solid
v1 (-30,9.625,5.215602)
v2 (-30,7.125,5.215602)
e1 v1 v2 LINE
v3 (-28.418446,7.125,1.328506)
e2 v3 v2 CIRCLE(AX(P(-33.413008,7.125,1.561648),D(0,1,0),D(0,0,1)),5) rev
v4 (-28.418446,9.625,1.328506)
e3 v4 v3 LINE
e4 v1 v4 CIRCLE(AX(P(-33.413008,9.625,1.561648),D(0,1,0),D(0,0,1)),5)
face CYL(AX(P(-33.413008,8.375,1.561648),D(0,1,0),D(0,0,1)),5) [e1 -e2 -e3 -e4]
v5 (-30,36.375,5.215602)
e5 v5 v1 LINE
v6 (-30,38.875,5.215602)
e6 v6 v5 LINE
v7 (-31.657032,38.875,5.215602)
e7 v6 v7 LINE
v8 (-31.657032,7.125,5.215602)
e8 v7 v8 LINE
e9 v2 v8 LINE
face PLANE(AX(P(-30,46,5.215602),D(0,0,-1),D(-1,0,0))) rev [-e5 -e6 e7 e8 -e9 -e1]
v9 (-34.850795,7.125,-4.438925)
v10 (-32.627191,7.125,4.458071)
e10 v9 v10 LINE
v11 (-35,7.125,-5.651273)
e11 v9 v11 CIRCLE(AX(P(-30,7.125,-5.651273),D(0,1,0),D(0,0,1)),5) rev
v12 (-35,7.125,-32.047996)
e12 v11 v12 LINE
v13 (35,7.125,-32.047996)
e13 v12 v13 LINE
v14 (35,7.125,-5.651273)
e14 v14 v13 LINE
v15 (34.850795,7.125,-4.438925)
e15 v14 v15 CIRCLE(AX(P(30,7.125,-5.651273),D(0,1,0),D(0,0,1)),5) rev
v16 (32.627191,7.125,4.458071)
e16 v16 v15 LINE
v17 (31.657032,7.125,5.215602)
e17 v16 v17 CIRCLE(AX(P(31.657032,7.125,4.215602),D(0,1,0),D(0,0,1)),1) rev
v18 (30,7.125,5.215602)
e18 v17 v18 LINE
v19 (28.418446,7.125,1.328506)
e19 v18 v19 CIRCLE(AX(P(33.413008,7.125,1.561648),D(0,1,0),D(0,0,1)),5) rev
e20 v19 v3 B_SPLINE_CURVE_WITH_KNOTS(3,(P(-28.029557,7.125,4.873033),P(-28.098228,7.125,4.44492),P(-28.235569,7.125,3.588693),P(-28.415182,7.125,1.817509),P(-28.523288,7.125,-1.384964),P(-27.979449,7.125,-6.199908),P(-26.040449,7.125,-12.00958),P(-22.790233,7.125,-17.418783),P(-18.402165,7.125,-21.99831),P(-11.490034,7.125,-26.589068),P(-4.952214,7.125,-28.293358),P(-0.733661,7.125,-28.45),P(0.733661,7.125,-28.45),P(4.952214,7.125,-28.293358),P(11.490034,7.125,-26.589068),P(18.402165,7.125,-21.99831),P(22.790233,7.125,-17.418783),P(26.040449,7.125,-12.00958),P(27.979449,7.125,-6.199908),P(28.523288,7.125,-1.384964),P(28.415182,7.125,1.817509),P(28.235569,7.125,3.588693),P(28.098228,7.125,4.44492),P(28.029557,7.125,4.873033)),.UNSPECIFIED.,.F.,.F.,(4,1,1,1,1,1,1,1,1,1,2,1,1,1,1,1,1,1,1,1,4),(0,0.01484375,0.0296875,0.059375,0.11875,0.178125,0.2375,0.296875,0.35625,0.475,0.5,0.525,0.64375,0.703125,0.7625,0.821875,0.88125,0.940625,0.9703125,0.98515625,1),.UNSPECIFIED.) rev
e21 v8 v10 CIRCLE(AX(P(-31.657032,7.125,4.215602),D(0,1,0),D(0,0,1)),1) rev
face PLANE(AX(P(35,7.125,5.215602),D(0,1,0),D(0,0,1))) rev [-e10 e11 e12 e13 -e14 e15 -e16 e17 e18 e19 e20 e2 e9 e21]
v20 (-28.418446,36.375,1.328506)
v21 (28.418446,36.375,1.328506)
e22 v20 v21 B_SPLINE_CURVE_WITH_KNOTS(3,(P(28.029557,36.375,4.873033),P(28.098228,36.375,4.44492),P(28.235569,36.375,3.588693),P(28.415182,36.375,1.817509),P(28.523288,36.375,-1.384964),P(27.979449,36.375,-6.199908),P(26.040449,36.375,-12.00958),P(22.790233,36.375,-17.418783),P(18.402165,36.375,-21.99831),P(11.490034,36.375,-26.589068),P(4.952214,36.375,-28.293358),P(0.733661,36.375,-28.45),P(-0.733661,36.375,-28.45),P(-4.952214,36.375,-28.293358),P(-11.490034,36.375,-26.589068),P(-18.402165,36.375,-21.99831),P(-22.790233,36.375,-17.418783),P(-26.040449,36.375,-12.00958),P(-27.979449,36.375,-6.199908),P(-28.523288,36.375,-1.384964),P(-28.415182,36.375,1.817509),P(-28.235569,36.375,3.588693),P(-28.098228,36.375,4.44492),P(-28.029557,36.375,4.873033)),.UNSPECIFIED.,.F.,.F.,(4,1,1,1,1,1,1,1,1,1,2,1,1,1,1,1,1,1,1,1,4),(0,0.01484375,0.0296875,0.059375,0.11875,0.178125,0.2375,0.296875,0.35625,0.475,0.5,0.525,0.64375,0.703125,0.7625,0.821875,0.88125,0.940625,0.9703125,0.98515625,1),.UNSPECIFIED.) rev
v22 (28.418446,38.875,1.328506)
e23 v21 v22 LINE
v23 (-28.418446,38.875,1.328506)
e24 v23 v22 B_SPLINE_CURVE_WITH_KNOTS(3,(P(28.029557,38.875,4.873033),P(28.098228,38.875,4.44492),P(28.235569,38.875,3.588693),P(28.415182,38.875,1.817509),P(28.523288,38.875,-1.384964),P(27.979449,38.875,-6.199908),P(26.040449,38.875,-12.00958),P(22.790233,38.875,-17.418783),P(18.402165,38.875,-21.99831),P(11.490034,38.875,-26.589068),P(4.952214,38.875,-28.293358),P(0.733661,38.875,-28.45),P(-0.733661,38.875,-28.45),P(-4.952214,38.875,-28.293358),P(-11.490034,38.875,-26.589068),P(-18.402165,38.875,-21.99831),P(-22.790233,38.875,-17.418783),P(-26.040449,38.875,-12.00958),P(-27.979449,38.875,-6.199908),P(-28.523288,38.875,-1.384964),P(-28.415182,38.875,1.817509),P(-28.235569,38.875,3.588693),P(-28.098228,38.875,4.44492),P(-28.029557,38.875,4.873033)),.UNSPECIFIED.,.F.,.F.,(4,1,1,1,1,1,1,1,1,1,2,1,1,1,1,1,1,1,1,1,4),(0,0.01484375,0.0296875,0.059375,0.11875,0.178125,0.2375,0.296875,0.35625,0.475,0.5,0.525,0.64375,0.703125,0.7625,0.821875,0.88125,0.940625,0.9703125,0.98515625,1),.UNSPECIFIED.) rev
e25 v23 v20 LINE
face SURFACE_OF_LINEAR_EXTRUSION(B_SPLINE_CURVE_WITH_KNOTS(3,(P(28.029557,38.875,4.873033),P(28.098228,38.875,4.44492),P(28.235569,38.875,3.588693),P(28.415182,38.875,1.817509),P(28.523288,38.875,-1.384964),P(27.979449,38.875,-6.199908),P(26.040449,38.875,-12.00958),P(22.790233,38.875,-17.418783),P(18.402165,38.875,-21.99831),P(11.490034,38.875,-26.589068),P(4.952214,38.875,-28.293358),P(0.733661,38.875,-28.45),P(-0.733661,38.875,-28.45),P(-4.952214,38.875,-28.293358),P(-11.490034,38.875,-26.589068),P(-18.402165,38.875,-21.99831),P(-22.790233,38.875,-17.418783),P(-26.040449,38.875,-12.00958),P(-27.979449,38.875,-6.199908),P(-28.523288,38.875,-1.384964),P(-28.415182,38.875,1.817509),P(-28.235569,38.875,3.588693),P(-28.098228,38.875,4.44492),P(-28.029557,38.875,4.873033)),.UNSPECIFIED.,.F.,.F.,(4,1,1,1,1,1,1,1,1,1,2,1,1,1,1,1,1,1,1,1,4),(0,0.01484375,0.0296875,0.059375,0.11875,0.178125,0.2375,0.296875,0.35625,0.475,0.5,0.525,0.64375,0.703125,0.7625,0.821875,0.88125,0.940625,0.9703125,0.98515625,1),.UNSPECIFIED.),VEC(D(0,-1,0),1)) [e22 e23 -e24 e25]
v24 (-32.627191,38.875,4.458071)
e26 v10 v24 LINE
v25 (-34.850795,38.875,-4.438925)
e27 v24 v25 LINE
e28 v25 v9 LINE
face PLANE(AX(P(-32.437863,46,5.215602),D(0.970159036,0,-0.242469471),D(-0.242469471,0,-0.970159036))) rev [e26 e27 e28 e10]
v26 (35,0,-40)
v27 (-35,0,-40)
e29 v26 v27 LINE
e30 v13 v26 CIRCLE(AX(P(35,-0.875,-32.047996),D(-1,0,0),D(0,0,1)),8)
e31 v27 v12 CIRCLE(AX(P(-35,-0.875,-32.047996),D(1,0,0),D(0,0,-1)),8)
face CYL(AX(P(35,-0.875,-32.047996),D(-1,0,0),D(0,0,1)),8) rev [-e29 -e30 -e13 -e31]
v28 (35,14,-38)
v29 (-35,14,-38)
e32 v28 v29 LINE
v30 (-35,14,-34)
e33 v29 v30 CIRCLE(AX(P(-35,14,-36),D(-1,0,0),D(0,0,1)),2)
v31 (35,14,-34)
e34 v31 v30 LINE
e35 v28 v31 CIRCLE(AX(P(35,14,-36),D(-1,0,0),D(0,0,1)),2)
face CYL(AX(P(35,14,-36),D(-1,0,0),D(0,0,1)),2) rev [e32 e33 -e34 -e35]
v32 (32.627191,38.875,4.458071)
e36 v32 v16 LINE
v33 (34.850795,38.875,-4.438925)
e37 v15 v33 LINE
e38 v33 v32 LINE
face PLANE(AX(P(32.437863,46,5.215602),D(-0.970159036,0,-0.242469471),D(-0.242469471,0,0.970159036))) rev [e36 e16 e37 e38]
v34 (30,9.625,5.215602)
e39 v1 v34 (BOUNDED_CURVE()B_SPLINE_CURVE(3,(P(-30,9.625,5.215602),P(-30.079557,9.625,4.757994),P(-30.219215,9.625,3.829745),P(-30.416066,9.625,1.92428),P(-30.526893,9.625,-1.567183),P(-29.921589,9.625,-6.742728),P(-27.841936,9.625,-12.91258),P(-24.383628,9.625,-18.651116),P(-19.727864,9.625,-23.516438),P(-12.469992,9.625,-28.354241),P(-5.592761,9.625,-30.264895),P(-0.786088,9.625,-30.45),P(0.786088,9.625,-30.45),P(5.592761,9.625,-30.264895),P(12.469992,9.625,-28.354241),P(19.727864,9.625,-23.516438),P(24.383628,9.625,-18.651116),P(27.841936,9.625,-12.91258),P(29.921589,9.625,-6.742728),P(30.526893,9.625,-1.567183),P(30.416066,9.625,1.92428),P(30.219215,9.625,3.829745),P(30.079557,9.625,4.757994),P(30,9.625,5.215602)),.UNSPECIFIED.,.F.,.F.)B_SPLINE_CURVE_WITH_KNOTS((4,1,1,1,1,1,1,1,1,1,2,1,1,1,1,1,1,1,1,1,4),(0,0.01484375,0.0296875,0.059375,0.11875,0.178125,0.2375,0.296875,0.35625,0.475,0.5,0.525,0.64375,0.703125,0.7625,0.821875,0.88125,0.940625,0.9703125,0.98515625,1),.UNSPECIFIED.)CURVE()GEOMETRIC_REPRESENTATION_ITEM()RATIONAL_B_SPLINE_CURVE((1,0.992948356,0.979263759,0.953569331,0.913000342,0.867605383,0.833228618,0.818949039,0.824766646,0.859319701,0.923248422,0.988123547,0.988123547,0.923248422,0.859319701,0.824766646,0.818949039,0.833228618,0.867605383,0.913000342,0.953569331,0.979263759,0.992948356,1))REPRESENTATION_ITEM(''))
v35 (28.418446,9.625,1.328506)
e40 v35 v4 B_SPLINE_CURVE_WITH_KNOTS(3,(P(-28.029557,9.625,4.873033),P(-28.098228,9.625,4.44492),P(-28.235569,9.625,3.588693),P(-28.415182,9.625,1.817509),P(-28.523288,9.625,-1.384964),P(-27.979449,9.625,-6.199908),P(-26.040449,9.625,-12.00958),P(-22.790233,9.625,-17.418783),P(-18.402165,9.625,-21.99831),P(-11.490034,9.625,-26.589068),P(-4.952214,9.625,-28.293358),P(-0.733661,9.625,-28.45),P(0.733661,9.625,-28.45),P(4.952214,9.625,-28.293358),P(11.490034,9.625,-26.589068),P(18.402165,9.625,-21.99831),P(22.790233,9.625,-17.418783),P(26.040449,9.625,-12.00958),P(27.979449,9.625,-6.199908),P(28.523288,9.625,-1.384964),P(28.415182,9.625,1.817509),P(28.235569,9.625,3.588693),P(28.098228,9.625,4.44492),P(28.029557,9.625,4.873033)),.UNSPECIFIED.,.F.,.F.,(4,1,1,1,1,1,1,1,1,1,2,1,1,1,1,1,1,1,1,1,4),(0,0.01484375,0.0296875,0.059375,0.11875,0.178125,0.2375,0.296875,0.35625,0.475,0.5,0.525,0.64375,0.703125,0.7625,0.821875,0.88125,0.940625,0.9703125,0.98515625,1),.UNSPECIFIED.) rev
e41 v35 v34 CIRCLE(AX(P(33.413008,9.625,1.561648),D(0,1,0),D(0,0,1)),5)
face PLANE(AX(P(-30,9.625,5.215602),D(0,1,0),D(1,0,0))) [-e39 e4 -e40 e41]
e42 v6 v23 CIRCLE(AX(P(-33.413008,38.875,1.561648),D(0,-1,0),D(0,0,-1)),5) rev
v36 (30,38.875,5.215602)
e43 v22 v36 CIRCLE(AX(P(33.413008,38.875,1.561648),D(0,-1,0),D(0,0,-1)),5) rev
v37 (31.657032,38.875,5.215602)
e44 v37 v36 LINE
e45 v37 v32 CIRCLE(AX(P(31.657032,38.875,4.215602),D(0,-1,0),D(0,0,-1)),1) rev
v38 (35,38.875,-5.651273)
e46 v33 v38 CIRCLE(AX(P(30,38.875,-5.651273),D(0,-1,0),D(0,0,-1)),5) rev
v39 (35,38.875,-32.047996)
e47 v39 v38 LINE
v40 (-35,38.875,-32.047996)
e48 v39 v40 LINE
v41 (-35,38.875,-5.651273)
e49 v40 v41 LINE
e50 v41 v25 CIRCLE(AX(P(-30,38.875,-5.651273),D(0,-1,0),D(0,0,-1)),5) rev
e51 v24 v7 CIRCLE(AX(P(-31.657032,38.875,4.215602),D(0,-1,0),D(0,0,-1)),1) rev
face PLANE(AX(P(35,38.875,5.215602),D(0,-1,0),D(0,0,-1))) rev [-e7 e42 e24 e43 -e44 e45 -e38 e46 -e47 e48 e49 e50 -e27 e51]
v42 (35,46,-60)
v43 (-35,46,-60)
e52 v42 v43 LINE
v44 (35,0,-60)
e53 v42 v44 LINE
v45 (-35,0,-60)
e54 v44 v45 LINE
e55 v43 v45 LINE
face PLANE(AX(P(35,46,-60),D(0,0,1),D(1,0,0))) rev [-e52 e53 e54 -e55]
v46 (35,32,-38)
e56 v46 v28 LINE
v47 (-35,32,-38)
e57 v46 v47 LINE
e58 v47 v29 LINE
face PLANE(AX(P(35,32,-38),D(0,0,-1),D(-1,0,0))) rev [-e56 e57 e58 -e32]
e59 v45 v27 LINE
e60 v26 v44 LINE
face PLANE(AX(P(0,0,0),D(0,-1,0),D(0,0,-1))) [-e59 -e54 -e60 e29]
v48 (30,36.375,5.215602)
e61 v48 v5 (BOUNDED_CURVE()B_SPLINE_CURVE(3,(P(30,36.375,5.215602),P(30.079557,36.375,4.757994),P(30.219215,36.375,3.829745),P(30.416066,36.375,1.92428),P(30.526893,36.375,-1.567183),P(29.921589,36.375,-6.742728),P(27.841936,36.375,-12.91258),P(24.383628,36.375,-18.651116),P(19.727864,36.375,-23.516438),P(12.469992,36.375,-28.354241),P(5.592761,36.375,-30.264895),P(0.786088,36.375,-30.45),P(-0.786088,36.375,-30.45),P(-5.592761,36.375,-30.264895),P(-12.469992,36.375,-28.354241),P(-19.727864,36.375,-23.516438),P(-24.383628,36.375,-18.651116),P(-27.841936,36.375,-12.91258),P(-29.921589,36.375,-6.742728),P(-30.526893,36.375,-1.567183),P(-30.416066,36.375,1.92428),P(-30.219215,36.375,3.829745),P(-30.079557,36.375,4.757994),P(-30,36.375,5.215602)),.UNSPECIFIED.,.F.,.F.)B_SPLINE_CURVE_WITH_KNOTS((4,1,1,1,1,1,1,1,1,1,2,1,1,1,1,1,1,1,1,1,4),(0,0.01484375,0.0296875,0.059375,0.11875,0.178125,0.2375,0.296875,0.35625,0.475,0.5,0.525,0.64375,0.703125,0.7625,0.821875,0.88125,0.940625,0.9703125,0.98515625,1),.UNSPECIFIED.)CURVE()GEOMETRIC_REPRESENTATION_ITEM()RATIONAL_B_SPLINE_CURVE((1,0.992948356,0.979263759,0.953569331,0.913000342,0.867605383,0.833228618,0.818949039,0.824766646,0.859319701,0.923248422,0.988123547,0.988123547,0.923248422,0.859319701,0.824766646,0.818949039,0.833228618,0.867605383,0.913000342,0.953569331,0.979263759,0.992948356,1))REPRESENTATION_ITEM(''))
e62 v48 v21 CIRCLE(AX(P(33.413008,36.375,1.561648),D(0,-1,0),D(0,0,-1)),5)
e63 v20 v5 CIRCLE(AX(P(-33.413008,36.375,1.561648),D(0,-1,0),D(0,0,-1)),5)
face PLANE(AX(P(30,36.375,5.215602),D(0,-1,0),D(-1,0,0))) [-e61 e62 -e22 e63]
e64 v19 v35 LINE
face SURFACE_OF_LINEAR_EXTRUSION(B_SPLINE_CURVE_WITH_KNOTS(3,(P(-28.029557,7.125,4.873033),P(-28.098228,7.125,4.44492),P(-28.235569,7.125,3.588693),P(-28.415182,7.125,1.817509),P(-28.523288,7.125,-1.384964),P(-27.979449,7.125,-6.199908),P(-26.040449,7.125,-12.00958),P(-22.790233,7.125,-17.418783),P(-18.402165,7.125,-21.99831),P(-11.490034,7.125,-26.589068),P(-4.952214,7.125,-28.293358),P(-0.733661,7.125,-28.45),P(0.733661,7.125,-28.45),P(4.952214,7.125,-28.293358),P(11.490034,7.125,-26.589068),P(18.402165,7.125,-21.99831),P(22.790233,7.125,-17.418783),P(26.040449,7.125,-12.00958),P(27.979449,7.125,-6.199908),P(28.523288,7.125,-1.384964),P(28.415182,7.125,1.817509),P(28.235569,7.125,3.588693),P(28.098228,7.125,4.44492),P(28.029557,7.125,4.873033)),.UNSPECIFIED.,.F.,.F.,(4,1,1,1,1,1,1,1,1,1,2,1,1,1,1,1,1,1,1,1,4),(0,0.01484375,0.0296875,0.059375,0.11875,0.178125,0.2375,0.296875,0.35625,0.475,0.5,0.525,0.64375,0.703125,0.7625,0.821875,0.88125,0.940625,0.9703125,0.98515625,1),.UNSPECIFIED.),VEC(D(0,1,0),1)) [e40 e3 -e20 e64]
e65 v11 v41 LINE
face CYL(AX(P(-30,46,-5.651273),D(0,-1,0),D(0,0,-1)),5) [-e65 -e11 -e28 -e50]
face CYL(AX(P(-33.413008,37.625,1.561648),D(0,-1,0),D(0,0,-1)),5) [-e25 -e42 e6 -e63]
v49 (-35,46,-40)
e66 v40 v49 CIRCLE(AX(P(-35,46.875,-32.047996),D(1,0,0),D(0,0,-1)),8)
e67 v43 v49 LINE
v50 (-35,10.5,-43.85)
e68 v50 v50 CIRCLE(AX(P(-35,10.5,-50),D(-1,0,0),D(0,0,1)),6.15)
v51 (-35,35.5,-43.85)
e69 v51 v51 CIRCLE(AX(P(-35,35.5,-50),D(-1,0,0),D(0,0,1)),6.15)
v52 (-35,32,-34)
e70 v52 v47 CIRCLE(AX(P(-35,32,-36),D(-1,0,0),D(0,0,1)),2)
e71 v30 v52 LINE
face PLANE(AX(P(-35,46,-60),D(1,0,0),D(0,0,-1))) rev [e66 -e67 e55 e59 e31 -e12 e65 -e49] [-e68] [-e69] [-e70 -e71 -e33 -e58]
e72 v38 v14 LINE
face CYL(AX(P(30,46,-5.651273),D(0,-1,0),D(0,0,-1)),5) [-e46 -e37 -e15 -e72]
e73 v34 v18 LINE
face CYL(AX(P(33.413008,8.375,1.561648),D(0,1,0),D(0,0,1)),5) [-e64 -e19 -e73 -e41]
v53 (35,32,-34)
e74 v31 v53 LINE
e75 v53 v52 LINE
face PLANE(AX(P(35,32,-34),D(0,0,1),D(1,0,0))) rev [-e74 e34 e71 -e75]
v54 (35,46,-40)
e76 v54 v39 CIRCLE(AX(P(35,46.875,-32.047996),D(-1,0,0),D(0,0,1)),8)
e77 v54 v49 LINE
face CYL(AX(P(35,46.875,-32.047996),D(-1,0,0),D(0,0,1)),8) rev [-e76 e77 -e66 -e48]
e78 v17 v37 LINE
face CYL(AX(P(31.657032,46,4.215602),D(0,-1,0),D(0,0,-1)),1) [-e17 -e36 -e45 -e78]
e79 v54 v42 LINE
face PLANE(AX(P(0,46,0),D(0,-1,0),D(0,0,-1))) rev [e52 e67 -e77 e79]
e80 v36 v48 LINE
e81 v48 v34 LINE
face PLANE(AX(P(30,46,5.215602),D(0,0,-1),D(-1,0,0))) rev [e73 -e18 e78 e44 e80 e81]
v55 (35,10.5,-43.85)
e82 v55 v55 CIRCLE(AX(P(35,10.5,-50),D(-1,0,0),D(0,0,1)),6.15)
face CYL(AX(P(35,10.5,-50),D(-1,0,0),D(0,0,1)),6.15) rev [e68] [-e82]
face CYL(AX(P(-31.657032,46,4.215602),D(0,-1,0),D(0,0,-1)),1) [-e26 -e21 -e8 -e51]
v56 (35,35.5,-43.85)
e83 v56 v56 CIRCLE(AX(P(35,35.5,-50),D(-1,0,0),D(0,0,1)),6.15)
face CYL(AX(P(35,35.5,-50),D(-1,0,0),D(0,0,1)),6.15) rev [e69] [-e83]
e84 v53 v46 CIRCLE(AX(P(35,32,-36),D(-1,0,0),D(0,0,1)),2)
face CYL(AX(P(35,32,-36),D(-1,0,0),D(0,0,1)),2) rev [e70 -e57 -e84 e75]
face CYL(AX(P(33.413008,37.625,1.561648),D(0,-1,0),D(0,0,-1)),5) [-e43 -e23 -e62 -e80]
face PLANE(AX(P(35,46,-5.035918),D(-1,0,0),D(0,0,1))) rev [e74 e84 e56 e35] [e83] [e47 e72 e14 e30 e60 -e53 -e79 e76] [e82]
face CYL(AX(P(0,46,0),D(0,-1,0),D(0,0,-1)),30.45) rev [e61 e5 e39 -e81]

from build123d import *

# Parameters (mm, degrees)
BOSS_EXTRUDE2_DEPTH = 46
SKETCH4_R           = 6.15
CUT_EXTRUDE1_DEPTH  = 104.033974979
SKETCH6_W           = 45.215601595
SKETCH6_H           = 7.125
CUT_EXTRUDE2_DEPTH  = 104.033974979
CUT_EXTRUDE3_DEPTH  = 104.033974979
FILLET1_R           = 8
THICKEN1_START      = 7.125
THICKEN1_DEPTH      = 2.5
THICKEN2_START      = 36.375
THICKEN2_DEPTH      = 2.5
FILLET3_START       = 6
FILLET3_DEPTH       = 34
FILLET4_R           = 1


with BuildPart() as part:
    # Sketch3 → Boss-Extrude2 (new body)
    with BuildSketch(Plane(origin=(0, 0, 0), x_dir=(1, 0, 0), z_dir=(0, 1, 0))):
        with BuildLine():
            Line((35, 5.035917613), (35, 60))
            Line((35, 60), (-35, 60))
            Line((-35, 60), (-35, 5.035917613))
            Line((-35, 5.035917613), (-32.437862919, -5.215601595))
            Line((-32.437862919, -5.215601595), (-30, -5.215601595))
            ThreePointArc((-30, -5.215601595), (0, 30.45), (30, -5.215601595))
            Line((30, -5.215601595), (32.437862919, -5.215601595))
            Line((32.437862919, -5.215601595), (35, 5.035917613))
        make_face()
    extrude(amount=BOSS_EXTRUDE2_DEPTH)

    # Sketch4 → Cut-Extrude1 (cut, through all)
    with BuildSketch(Plane.ZY.offset(35)):
        with Locations((-50, 35.5)):
            Circle(SKETCH4_R)
        with Locations((-50, 10.5)):
            Circle(SKETCH4_R)
    extrude(amount=-CUT_EXTRUDE1_DEPTH, mode=Mode.SUBTRACT)

    # Sketch6 → Cut-Extrude2 (cut, through all)
    with BuildSketch(Plane.ZY.offset(35)):
        with Locations((-17.392199202, 42.4375)):
            Rectangle(SKETCH6_W, SKETCH6_H)
        with Locations((-17.392199202, 3.5625)):
            Rectangle(SKETCH6_W, SKETCH6_H)
    extrude(amount=-CUT_EXTRUDE2_DEPTH, mode=Mode.SUBTRACT)

    # Sketch7 → Cut-Extrude3 (cut, through all)
    with BuildSketch(Plane.ZY.offset(35)):
        with BuildLine():
            Line((-34, 32), (-34, 14))
            ThreePointArc((-34, 14), (-36, 12), (-38, 14))
            Line((-38, 14), (-38, 32))
            ThreePointArc((-38, 32), (-36, 34), (-34, 32))
        make_face()
    extrude(amount=-CUT_EXTRUDE3_DEPTH, mode=Mode.SUBTRACT)

    # Fillet1
    # the kernel refuses this fillet: 8 mm, written as the material it adds along each edge
    with BuildSketch(Plane(origin=(-35, 38.875, -40), x_dir=(0, 0, 1), z_dir=(1, 0, 0))) as fillet1_piece_1:
        with BuildLine():
            CenterArc((7.952004464, -8), FILLET1_R, 90, 83.720711677)
            Line((0, -7.125), (-0.159040089, -7.1075))
            ThreePointArc((-0.159040089, -7.1075), (-0.16, -3.5625), (-0.16, 0))
            Line((-0.16, 0), (0, 0.16))
            Line((0, 0.16), (7.952004464, 0.16))
            Line((7.952004464, 0.16), (7.952004464, 0))
        make_face()
    extrude(amount=70)
    with BuildSketch(Plane(origin=(-35, 7.125, -40), x_dir=(0, 0, 1), z_dir=(1, 0, 0))) as fillet1_piece_2:
        with BuildLine():
            CenterArc((7.952004464, 8), FILLET1_R, 186.279288323, 83.720711677)
            Line((0, 7.125), (-0.159040089, 7.1075))
            ThreePointArc((-0.159040089, 7.1075), (-0.16, 3.5625), (-0.16, 0))
            Line((-0.16, 0), (0, -0.16))
            Line((0, -0.16), (7.952004464, -0.16))
            Line((7.952004464, -0.16), (7.952004464, 0))
        make_face()
    extrude(amount=70)

    # Thicken1: read off the stored shape, not the designer's step
    # Thicken1 outline → Thicken1 (add)
    with BuildSketch(Plane(origin=(0, 0, 0), x_dir=(1, 0, 0), z_dir=(0, 1, 0)).offset(THICKEN1_START)):
        with BuildLine():
            Line((-30, -5.215601595), (-28.02955665, -4.873033346))
            add(Edge.make_bspline(
                [(-28.02955665, -4.873033346), (-28.098227513, -4.44491985), (-28.235569238, -3.588692857), (-28.415182418, -1.817508912), (-28.523288215, 1.384964463), (-27.97944925, 6.199907689), (-26.040449122, 12.009579762), (-22.790232653, 17.418782717), (-18.402164664, 21.998309903), (-11.490033606, 26.589068444), (-4.952214398, 28.293358132), (-0.733661392, 28.45), (0.733661392, 28.45), (4.952214398, 28.293358132), (11.490033606, 26.589068444), (18.402164664, 21.998309903), (22.790232653, 17.418782717), (26.040449122, 12.009579762), (27.97944925, 6.199907689), (28.523288215, 1.384964463), (28.415182418, -1.817508912), (28.235569238, -3.588692857), (28.098227513, -4.44491985), (28.02955665, -4.873033346)],
                knots=[0, 0, 0, 0, 0.01484375, 0.0296875, 0.059375, 0.11875, 0.178125, 0.2375, 0.296875, 0.35625, 0.475, 0.5, 0.5, 0.525, 0.64375, 0.703125, 0.7625, 0.821875, 0.88125, 0.940625, 0.9703125, 0.98515625, 1, 1, 1, 1], degree=3))
            Line((28.02955665, -4.873033346), (30, -5.215601595))
            ThreePointArc((30, -5.215601595), (0, 30.45), (-30, -5.215601595))
        make_face()
    extrude(amount=THICKEN1_DEPTH)

    # Thicken2: read off the stored shape, not the designer's step
    # Thicken2 outline → Thicken2 (add)
    with BuildSketch(Plane(origin=(0, 0, 0), x_dir=(1, 0, 0), z_dir=(0, 1, 0)).offset(THICKEN2_START)):
        with BuildLine():
            add(Edge.make_bspline(
                [(28.02955665, -4.873033346), (28.098227513, -4.44491985), (28.235569238, -3.588692857), (28.415182418, -1.817508912), (28.523288215, 1.384964463), (27.97944925, 6.199907689), (26.040449122, 12.009579762), (22.790232653, 17.418782717), (18.402164664, 21.998309903), (11.490033606, 26.589068444), (4.952214398, 28.293358132), (0.733661392, 28.45), (-0.733661392, 28.45), (-4.952214398, 28.293358132), (-11.490033606, 26.589068444), (-18.402164664, 21.998309903), (-22.790232653, 17.418782717), (-26.040449122, 12.009579762), (-27.97944925, 6.199907689), (-28.523288215, 1.384964463), (-28.415182418, -1.817508912), (-28.235569238, -3.588692857), (-28.098227513, -4.44491985), (-28.02955665, -4.873033346)],
                knots=[0, 0, 0, 0, 0.01484375, 0.0296875, 0.059375, 0.11875, 0.178125, 0.2375, 0.296875, 0.35625, 0.475, 0.5, 0.5, 0.525, 0.64375, 0.703125, 0.7625, 0.821875, 0.88125, 0.940625, 0.9703125, 0.98515625, 1, 1, 1, 1], degree=3))
            Line((28.02955665, -4.873033346), (30, -5.215601595))
            ThreePointArc((30, -5.215601595), (0, 30.45), (-30, -5.215601595))
            Line((-30, -5.215601595), (-28.02955665, -4.873033346))
        make_face()
    extrude(amount=THICKEN2_DEPTH)

    # Fillet3: read off the stored shape, not the designer's step
    # Fillet3 outline → Fillet3 (cut)
    with BuildSketch(Plane(origin=(0, 0, 0), x_dir=(1, 0, 0), z_dir=(0, 1, 0)).offset(FILLET3_START)):
        with BuildLine():
            Line((35, 5.035917613), (35, 5.651272685))
            ThreePointArc((35, 5.651272685), (34.962558609, 5.040525563), (34.850795181, 4.438925329))
            Line((34.850795181, 4.438925329), (35, 5.035917613))
        make_face()
        with BuildLine():
            Line((-35, 5.035917613), (-34.850795181, 4.438925329))
            ThreePointArc((-34.850795181, 4.438925329), (-34.962558609, 5.040525563), (-35, 5.651272685))
            Line((-35, 5.651272685), (-35, 5.035917613))
        make_face()
        with BuildLine():
            add(Edge.make_bspline(
                [(-28.02955665, -4.873033346), (-28.098227513, -4.44491985), (-28.235569238, -3.588692857), (-28.356138896, -2.399743128), (-28.403921261, -1.639675399), (-28.418446433, -1.328505626)],
                knots=[0, 0, 0, 0, 0.01484375, 0.0296875, 0.039856894, 0.039856894, 0.039856894, 0.039856894], degree=3))
            ThreePointArc((-28.418446433, -1.328505626), (-28.781681481, -3.446008708), (-30, -5.215601595))
            Line((-30, -5.215601595), (-28.02955665, -4.873033346))
        make_face()
        with BuildLine():
            ThreePointArc((30, -5.215601595), (28.781681481, -3.446008708), (28.418446433, -1.328505626))
            add(Edge.make_bspline(
                [(28.418446433, -1.328505626), (28.403921261, -1.639675399), (28.356138896, -2.399743128), (28.235569238, -3.588692857), (28.098227513, -4.44491985), (28.02955665, -4.873033346)],
                knots=[0.960143106, 0.960143106, 0.960143106, 0.960143106, 0.9703125, 0.98515625, 1, 1, 1, 1], degree=3))
            Line((28.02955665, -4.873033346), (30, -5.215601595))
        make_face()
    extrude(amount=FILLET3_DEPTH, mode=Mode.SUBTRACT)

    # Fillet4
    fillet4_edges = [part.edges().sort_by_distance(p)[0] for p in [
        (-32.437862919, 23, 5.215601595),
        (32.437862919, 23, 5.215601595),
    ]]
    fillet(fillet4_edges, radius=FILLET4_R)


solid = part.part
